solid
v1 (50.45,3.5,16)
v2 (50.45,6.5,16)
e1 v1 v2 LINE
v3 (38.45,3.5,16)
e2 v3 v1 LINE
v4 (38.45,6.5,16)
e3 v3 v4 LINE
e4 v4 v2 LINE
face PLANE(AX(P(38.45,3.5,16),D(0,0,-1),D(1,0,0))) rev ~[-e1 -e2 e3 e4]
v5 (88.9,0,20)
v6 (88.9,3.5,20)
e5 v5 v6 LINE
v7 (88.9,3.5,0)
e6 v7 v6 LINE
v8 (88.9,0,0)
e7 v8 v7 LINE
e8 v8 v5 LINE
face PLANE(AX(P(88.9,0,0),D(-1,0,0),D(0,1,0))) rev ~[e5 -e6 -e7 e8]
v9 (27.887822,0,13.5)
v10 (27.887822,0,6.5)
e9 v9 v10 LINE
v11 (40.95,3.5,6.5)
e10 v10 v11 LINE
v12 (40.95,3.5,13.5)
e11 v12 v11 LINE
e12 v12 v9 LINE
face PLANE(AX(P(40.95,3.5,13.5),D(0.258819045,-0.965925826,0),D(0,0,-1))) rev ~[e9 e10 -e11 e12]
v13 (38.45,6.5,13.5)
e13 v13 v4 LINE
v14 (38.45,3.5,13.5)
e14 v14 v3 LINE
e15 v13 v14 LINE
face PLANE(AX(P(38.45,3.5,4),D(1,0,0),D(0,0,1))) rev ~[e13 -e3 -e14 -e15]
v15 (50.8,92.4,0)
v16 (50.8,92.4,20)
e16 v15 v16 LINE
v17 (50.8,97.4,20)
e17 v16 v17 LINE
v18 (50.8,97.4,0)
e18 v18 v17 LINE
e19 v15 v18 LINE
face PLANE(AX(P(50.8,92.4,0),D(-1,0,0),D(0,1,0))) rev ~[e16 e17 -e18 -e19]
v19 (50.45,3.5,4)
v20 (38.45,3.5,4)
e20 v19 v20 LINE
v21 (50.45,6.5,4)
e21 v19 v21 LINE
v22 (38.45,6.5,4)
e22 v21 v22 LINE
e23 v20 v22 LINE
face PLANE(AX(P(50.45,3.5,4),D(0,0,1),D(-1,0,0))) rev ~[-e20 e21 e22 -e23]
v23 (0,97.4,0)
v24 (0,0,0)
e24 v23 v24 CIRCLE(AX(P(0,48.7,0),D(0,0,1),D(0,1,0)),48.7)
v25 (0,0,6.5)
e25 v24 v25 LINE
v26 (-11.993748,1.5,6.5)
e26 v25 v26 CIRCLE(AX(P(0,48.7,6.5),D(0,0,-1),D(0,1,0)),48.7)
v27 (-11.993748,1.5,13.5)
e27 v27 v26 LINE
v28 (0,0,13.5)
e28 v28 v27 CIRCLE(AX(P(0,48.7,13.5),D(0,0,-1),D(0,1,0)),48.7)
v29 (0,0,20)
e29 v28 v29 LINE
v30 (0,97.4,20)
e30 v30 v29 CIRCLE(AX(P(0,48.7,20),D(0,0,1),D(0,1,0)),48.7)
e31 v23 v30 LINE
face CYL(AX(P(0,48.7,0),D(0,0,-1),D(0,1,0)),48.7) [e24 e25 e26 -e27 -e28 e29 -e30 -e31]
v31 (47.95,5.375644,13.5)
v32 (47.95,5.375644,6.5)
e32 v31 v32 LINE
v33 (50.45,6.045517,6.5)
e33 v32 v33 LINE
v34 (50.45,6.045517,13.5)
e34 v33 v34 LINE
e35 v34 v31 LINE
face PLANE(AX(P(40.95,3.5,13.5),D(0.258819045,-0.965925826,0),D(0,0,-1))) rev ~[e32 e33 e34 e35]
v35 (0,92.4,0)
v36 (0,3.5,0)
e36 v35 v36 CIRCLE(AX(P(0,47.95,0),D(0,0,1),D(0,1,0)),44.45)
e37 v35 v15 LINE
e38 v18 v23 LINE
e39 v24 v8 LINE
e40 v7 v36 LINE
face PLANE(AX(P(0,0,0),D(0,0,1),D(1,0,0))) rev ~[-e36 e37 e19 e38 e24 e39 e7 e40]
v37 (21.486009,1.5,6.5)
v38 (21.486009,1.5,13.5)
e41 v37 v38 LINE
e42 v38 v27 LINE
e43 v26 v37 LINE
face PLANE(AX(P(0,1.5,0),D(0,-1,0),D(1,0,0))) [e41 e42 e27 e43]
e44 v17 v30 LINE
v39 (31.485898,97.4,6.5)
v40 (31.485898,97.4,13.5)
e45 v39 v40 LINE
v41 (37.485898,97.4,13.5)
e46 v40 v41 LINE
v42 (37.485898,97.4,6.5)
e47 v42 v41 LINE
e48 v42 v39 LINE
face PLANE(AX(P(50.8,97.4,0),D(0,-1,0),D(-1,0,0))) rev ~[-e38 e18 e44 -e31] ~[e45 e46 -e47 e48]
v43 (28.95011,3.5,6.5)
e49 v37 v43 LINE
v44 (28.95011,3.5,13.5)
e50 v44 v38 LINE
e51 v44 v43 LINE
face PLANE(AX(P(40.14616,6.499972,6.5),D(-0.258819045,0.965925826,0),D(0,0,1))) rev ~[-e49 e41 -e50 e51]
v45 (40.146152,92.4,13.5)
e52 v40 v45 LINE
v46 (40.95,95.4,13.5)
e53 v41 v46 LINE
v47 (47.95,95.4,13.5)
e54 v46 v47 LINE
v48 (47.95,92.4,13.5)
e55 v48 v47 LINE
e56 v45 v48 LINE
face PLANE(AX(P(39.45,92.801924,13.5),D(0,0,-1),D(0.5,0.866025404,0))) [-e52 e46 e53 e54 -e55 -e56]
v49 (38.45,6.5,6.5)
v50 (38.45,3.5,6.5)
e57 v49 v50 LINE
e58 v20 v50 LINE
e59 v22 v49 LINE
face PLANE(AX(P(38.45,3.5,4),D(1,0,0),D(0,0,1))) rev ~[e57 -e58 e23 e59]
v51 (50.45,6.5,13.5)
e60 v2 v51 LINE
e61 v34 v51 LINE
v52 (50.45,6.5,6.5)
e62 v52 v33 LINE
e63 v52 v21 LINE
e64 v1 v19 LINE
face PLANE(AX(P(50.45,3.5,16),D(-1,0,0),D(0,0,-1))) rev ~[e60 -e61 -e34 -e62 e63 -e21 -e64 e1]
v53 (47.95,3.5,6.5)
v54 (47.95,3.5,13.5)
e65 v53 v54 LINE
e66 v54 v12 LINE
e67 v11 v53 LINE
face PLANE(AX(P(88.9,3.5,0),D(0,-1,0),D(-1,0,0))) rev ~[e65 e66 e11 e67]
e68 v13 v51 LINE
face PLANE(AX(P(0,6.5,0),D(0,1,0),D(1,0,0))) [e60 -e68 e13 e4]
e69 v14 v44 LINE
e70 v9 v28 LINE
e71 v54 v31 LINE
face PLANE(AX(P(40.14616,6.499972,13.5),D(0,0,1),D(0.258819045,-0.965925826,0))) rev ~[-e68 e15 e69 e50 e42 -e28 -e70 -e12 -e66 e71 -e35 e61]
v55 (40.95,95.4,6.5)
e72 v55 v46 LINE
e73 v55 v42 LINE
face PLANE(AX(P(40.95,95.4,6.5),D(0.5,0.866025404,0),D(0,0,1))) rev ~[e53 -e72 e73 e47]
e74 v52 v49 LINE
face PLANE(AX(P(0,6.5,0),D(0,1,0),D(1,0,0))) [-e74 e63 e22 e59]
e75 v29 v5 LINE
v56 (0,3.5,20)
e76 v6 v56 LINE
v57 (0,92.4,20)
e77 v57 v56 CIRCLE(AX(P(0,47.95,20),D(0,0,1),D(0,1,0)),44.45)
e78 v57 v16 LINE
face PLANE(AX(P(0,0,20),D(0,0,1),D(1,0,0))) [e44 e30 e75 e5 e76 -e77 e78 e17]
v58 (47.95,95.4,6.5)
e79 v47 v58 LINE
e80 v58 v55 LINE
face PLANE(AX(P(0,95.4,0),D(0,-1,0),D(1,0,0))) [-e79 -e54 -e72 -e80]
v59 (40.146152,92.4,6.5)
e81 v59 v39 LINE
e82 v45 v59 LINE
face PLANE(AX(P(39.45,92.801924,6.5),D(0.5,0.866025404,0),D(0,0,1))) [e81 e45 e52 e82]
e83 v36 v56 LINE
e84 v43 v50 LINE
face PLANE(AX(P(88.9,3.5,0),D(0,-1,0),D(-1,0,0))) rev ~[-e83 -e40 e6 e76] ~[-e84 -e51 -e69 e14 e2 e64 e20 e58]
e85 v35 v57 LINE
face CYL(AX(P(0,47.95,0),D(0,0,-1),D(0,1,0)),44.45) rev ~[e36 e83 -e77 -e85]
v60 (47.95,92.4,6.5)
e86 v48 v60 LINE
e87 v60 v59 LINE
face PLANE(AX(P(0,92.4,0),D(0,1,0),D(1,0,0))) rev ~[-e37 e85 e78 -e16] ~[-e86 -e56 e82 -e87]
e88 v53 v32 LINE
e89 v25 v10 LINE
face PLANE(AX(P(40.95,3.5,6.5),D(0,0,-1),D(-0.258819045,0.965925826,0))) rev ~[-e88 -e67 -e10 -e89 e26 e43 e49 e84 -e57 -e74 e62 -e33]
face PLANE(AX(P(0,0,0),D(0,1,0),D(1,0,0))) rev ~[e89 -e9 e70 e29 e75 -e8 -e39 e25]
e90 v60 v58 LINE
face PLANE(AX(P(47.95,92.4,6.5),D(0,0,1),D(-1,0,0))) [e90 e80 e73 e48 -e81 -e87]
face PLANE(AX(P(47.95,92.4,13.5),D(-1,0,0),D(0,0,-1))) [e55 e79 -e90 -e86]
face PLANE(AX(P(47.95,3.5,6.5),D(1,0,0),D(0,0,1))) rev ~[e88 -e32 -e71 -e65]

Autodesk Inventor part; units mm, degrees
ref_plane "YZ Plane" through (0, 0, 0) normal (1, 0, 0) x (0, 1, 0)
ref_plane "XZ Plane" through (0, 0, 0) normal (0, 1, 0) x (-1, 0, 0)
sketch "Sketch1" plane through (0, 0, 0) normal (0, 0, 1) x (1, 0, 0)
  line L0 (0, 0) -> (88.9, 0)
  line L1 (88.9, 0) -> (88.9, 3.5)
  line L2 (88.9, 3.5) -> (0, 3.5)
  line L3 (0, 3.5) -> (0, 0)
  line L4 (0, 92.4) -> (50.8, 92.4)
  line L5 (50.8, 92.4) -> (50.8, 97.4)
  line L6 (50.8, 97.4) -> (0, 97.4)
  line L7 (0, 97.4) -> (0, 92.4)
  arc A0 (0, 92.4) -> (0, 3.5) centre (0, 47.95) ccw
  arc A1 (0, 97.4) -> (0, 0) centre (0, 48.7) ccw
  dimension "d0" = 88.9
  dimension "d1" = 3.5
  dimension "d2" = 50.8
  dimension "d3" = 5
  dimension "d4" = 88.9
extrude "Extrusion1" add sketch "Sketch1" along normal blind 20
sketch "Sketch2" plane through (0, 3.5, 0) normal (0, 1, 0) x (1, 0, 0)
  line L0 (88.9, 0) -> (0, 0) projected
  line L1 (0, 0) -> (0, -20) projected
  line L2 (88.9, -20) -> (0, -20) projected
  line L3 (88.9, 0) -> (88.9, -20) projected
sketch "Sketch3" plane through (0, 92.4, 0) normal (0, -1, 0) x (1, 0, 0)
  line L0 (0, 0) -> (0, 20) projected
  line L1 (47.95, 6.5) -> (40.95, 6.5)
  line L2 (40.95, 6.5) -> (40.95, 13.5)
  line L3 (40.95, 13.5) -> (47.95, 13.5)
  line L4 (47.95, 13.5) -> (47.95, 6.5)
  line L5 (47.95, 6.5) -> (40.95, 13.5) construction
  line L6 (40.95, 6.5) -> (47.95, 13.5) construction
  point P0 (44.45, 10)
  dimension "d8" = 7
  dimension "d9" = 7
  dimension "d10" = 44.45
extrude "Extrusion2" cut sketch "Sketch3" against normal blind 3
ref_plane "Work Plane1" through (40.95, 95.4, 6.5) normal (-0.8660254, 0.5, 0) x (0, 0, 1)
sketch "Sketch4" plane through (40.95, 95.4, 6.5) normal (-0.8660254, 0.5, 0) x (0, 0, 1)
  line L0 (0, 0) -> (7, 0) projected
  line L1 (-6.5, -104.4399) -> (13.5, -104.4399) projected
  line L2 (13.5, -104.4399) -> (13.5, -108.0877) projected
  line L3 (13.5, -108.0877) -> (-6.5, -108.0877) projected
  line L4 (-6.5, -108.0877) -> (-6.5, -104.4399) projected
  line L5 (13.5, -3.4641) -> (-6.5, -3.4641) projected
  line L6 (-6.5, -3.4641) -> (-6.5, 2.3094) projected
  line L7 (-6.5, 2.3094) -> (13.5, 2.3094) projected
  line L8 (13.5, 2.3094) -> (13.5, -3.4641) projected
  line L9 (7, 0) -> (0, 0)
  line L10 (0, 0) -> (0, -3)
  line L11 (0, -3) -> (7, -3)
  line L12 (7, -3) -> (7, 0)
  point P0 (-6.5, -103.0938)
  dimension "d14" = 3
extrude "Extrusion3" cut sketch "Sketch4" along normal through all both and the other way through all contours L0 L12 L11 L10
sketch "Sketch5" plane through (0, 3.5, 0) normal (0, 1, 0) x (1, 0, 0)
  line L0 (0, 0) -> (0, -20) projected
  line L1 (47.95, -13.5) -> (40.95, -13.5)
  line L2 (40.95, -13.5) -> (40.95, -6.5)
  line L3 (40.95, -6.5) -> (47.95, -6.5)
  line L4 (47.95, -6.5) -> (47.95, -13.5)
  line L5 (47.95, -13.5) -> (40.95, -6.5) construction
  line L6 (40.95, -13.5) -> (47.95, -6.5) construction
  line L7 (38.45, -16) -> (50.45, -16)
  line L8 (50.45, -16) -> (50.45, -4)
  line L9 (50.45, -4) -> (38.45, -4)
  line L10 (38.45, -4) -> (38.45, -16)
  line L11 (38.45, -16) -> (50.45, -4) construction
  line L12 (50.45, -16) -> (38.45, -4) construction
  point P0 (44.45, -10)
  dimension "d17" = 7
  dimension "d18" = 7
  dimension "d19" = 44.45
  dimension "d20" = 12
  dimension "d21" = 12
extrude "Extrusion4" add sketch "Sketch5" along normal blind 3
ref_plane "Work Plane2" through (40.95, 3.5, 3.25) normal (-0.9659258, -0.258819, 0) x (0, 0, 1)
sketch "Sketch6" plane through (40.95, 3.5, 3.25) normal (-0.9659258, -0.258819, 0) x (0, 0, 1)
  line L0 (10.25, 0) -> (3.25, 0) projected
  line L1 (16.75, -3.6235) -> (-3.25, -3.6235) projected
  line L2 (-3.25, -3.6235) -> (-3.25, 0) projected
  line L3 (-3.25, 0) -> (0.75, 0) projected
  line L4 (0.75, 0) -> (0.75, 3.1058) projected
  line L5 (0.75, 3.1058) -> (12.75, 3.1058) projected
  line L6 (12.75, 3.1058) -> (12.75, 0) projected
  line L7 (12.75, 0) -> (16.75, 0) projected
  line L8 (16.75, 0) -> (16.75, -3.6235) projected
  line L9 (16.75, 92.0361) -> (-3.25, 92.0361) projected
  line L10 (-3.25, 92.0361) -> (-3.25, 97.2124) projected
  line L11 (-3.25, 97.2124) -> (16.75, 97.2124) projected
  line L12 (16.75, 97.2124) -> (16.75, 92.0361) projected
  line L13 (10.25, 0) -> (3.25, 0)
  line L14 (3.25, 0) -> (3.25, 3.1058)
  line L15 (3.25, 3.1058) -> (10.25, 3.1058)
  line L16 (10.25, 3.1058) -> (10.25, 0)
  point P0 (-3.25, 7.2179)
extrude "Extrusion5" cut sketch "Sketch6" along normal through all both and the other way through all contours L0 L14 L5 L16
sketch "Sketch7" plane through (0, 6.5, 0) normal (0, 1, 0) x (1, 0, 0)
  line L0 (40.1462, -13.5) -> (40.1462, -6.5) projected
  line L1 (38.45, -4) -> (38.45, -16) projected
  line L2 (38.45, -16) -> (38.45, -4) projected
  line L3 (38.45, -4) -> (50.45, -4) projected
  line L4 (50.45, -4) -> (50.45, -6.5) projected
  line L5 (50.45, -6.5) -> (40.1462, -6.5) projected
  line L6 (40.1462, -6.5) -> (40.1462, -13.5) projected
  line L7 (40.1462, -13.5) -> (50.45, -13.5) projected
  line L8 (50.45, -13.5) -> (50.45, -16) projected
  line L9 (50.45, -16) -> (38.45, -16) projected
  line L10 (-16.053, 0) -> (-16.053, -20) projected
  line L11 (-16.053, -20) -> (-24.3074, -20) projected
  line L12 (-24.3074, -20) -> (-24.3074, 0) projected
  line L13 (-24.3074, 0) -> (-16.053, 0) projected
  line L14 (40.1462, -13.5) -> (38.45, -13.5) projected
  line L15 (40.1462, -6.5) -> (38.45, -6.5) projected
  point P0 (0, 0)
extrude "Extrusion6" cut sketch "Sketch7" against normal blind 3 contours L14 L1 L15 L0
sketch "Sketch8" plane through (0, 0, 0) normal (0, -1, 0) x (1, 0, 0)
  line L0 (27.8878, 13.5) -> (27.8878, 6.5) projected
  line L1 (27.8878, 6.5) -> (15.8878, 6.5) projected
  line L2 (15.8878, 6.5) -> (15.8878, 13.5) projected
  line L3 (15.8878, 13.5) -> (27.8878, 13.5) projected
  line L4 (15.8878, 13.5) -> (-12.9863, 13.5)
  line L5 (-12.9863, 13.5) -> (-12.9863, 6.5)
  line L6 (-12.9863, 6.5) -> (15.8878, 6.5)
  line L7 (15.8878, 6.5) -> (15.8878, 13.5)
extrude "Extrusion7" cut sketch "Sketch8" against normal blind 1.5
properties part number "PinewoodFinish"
